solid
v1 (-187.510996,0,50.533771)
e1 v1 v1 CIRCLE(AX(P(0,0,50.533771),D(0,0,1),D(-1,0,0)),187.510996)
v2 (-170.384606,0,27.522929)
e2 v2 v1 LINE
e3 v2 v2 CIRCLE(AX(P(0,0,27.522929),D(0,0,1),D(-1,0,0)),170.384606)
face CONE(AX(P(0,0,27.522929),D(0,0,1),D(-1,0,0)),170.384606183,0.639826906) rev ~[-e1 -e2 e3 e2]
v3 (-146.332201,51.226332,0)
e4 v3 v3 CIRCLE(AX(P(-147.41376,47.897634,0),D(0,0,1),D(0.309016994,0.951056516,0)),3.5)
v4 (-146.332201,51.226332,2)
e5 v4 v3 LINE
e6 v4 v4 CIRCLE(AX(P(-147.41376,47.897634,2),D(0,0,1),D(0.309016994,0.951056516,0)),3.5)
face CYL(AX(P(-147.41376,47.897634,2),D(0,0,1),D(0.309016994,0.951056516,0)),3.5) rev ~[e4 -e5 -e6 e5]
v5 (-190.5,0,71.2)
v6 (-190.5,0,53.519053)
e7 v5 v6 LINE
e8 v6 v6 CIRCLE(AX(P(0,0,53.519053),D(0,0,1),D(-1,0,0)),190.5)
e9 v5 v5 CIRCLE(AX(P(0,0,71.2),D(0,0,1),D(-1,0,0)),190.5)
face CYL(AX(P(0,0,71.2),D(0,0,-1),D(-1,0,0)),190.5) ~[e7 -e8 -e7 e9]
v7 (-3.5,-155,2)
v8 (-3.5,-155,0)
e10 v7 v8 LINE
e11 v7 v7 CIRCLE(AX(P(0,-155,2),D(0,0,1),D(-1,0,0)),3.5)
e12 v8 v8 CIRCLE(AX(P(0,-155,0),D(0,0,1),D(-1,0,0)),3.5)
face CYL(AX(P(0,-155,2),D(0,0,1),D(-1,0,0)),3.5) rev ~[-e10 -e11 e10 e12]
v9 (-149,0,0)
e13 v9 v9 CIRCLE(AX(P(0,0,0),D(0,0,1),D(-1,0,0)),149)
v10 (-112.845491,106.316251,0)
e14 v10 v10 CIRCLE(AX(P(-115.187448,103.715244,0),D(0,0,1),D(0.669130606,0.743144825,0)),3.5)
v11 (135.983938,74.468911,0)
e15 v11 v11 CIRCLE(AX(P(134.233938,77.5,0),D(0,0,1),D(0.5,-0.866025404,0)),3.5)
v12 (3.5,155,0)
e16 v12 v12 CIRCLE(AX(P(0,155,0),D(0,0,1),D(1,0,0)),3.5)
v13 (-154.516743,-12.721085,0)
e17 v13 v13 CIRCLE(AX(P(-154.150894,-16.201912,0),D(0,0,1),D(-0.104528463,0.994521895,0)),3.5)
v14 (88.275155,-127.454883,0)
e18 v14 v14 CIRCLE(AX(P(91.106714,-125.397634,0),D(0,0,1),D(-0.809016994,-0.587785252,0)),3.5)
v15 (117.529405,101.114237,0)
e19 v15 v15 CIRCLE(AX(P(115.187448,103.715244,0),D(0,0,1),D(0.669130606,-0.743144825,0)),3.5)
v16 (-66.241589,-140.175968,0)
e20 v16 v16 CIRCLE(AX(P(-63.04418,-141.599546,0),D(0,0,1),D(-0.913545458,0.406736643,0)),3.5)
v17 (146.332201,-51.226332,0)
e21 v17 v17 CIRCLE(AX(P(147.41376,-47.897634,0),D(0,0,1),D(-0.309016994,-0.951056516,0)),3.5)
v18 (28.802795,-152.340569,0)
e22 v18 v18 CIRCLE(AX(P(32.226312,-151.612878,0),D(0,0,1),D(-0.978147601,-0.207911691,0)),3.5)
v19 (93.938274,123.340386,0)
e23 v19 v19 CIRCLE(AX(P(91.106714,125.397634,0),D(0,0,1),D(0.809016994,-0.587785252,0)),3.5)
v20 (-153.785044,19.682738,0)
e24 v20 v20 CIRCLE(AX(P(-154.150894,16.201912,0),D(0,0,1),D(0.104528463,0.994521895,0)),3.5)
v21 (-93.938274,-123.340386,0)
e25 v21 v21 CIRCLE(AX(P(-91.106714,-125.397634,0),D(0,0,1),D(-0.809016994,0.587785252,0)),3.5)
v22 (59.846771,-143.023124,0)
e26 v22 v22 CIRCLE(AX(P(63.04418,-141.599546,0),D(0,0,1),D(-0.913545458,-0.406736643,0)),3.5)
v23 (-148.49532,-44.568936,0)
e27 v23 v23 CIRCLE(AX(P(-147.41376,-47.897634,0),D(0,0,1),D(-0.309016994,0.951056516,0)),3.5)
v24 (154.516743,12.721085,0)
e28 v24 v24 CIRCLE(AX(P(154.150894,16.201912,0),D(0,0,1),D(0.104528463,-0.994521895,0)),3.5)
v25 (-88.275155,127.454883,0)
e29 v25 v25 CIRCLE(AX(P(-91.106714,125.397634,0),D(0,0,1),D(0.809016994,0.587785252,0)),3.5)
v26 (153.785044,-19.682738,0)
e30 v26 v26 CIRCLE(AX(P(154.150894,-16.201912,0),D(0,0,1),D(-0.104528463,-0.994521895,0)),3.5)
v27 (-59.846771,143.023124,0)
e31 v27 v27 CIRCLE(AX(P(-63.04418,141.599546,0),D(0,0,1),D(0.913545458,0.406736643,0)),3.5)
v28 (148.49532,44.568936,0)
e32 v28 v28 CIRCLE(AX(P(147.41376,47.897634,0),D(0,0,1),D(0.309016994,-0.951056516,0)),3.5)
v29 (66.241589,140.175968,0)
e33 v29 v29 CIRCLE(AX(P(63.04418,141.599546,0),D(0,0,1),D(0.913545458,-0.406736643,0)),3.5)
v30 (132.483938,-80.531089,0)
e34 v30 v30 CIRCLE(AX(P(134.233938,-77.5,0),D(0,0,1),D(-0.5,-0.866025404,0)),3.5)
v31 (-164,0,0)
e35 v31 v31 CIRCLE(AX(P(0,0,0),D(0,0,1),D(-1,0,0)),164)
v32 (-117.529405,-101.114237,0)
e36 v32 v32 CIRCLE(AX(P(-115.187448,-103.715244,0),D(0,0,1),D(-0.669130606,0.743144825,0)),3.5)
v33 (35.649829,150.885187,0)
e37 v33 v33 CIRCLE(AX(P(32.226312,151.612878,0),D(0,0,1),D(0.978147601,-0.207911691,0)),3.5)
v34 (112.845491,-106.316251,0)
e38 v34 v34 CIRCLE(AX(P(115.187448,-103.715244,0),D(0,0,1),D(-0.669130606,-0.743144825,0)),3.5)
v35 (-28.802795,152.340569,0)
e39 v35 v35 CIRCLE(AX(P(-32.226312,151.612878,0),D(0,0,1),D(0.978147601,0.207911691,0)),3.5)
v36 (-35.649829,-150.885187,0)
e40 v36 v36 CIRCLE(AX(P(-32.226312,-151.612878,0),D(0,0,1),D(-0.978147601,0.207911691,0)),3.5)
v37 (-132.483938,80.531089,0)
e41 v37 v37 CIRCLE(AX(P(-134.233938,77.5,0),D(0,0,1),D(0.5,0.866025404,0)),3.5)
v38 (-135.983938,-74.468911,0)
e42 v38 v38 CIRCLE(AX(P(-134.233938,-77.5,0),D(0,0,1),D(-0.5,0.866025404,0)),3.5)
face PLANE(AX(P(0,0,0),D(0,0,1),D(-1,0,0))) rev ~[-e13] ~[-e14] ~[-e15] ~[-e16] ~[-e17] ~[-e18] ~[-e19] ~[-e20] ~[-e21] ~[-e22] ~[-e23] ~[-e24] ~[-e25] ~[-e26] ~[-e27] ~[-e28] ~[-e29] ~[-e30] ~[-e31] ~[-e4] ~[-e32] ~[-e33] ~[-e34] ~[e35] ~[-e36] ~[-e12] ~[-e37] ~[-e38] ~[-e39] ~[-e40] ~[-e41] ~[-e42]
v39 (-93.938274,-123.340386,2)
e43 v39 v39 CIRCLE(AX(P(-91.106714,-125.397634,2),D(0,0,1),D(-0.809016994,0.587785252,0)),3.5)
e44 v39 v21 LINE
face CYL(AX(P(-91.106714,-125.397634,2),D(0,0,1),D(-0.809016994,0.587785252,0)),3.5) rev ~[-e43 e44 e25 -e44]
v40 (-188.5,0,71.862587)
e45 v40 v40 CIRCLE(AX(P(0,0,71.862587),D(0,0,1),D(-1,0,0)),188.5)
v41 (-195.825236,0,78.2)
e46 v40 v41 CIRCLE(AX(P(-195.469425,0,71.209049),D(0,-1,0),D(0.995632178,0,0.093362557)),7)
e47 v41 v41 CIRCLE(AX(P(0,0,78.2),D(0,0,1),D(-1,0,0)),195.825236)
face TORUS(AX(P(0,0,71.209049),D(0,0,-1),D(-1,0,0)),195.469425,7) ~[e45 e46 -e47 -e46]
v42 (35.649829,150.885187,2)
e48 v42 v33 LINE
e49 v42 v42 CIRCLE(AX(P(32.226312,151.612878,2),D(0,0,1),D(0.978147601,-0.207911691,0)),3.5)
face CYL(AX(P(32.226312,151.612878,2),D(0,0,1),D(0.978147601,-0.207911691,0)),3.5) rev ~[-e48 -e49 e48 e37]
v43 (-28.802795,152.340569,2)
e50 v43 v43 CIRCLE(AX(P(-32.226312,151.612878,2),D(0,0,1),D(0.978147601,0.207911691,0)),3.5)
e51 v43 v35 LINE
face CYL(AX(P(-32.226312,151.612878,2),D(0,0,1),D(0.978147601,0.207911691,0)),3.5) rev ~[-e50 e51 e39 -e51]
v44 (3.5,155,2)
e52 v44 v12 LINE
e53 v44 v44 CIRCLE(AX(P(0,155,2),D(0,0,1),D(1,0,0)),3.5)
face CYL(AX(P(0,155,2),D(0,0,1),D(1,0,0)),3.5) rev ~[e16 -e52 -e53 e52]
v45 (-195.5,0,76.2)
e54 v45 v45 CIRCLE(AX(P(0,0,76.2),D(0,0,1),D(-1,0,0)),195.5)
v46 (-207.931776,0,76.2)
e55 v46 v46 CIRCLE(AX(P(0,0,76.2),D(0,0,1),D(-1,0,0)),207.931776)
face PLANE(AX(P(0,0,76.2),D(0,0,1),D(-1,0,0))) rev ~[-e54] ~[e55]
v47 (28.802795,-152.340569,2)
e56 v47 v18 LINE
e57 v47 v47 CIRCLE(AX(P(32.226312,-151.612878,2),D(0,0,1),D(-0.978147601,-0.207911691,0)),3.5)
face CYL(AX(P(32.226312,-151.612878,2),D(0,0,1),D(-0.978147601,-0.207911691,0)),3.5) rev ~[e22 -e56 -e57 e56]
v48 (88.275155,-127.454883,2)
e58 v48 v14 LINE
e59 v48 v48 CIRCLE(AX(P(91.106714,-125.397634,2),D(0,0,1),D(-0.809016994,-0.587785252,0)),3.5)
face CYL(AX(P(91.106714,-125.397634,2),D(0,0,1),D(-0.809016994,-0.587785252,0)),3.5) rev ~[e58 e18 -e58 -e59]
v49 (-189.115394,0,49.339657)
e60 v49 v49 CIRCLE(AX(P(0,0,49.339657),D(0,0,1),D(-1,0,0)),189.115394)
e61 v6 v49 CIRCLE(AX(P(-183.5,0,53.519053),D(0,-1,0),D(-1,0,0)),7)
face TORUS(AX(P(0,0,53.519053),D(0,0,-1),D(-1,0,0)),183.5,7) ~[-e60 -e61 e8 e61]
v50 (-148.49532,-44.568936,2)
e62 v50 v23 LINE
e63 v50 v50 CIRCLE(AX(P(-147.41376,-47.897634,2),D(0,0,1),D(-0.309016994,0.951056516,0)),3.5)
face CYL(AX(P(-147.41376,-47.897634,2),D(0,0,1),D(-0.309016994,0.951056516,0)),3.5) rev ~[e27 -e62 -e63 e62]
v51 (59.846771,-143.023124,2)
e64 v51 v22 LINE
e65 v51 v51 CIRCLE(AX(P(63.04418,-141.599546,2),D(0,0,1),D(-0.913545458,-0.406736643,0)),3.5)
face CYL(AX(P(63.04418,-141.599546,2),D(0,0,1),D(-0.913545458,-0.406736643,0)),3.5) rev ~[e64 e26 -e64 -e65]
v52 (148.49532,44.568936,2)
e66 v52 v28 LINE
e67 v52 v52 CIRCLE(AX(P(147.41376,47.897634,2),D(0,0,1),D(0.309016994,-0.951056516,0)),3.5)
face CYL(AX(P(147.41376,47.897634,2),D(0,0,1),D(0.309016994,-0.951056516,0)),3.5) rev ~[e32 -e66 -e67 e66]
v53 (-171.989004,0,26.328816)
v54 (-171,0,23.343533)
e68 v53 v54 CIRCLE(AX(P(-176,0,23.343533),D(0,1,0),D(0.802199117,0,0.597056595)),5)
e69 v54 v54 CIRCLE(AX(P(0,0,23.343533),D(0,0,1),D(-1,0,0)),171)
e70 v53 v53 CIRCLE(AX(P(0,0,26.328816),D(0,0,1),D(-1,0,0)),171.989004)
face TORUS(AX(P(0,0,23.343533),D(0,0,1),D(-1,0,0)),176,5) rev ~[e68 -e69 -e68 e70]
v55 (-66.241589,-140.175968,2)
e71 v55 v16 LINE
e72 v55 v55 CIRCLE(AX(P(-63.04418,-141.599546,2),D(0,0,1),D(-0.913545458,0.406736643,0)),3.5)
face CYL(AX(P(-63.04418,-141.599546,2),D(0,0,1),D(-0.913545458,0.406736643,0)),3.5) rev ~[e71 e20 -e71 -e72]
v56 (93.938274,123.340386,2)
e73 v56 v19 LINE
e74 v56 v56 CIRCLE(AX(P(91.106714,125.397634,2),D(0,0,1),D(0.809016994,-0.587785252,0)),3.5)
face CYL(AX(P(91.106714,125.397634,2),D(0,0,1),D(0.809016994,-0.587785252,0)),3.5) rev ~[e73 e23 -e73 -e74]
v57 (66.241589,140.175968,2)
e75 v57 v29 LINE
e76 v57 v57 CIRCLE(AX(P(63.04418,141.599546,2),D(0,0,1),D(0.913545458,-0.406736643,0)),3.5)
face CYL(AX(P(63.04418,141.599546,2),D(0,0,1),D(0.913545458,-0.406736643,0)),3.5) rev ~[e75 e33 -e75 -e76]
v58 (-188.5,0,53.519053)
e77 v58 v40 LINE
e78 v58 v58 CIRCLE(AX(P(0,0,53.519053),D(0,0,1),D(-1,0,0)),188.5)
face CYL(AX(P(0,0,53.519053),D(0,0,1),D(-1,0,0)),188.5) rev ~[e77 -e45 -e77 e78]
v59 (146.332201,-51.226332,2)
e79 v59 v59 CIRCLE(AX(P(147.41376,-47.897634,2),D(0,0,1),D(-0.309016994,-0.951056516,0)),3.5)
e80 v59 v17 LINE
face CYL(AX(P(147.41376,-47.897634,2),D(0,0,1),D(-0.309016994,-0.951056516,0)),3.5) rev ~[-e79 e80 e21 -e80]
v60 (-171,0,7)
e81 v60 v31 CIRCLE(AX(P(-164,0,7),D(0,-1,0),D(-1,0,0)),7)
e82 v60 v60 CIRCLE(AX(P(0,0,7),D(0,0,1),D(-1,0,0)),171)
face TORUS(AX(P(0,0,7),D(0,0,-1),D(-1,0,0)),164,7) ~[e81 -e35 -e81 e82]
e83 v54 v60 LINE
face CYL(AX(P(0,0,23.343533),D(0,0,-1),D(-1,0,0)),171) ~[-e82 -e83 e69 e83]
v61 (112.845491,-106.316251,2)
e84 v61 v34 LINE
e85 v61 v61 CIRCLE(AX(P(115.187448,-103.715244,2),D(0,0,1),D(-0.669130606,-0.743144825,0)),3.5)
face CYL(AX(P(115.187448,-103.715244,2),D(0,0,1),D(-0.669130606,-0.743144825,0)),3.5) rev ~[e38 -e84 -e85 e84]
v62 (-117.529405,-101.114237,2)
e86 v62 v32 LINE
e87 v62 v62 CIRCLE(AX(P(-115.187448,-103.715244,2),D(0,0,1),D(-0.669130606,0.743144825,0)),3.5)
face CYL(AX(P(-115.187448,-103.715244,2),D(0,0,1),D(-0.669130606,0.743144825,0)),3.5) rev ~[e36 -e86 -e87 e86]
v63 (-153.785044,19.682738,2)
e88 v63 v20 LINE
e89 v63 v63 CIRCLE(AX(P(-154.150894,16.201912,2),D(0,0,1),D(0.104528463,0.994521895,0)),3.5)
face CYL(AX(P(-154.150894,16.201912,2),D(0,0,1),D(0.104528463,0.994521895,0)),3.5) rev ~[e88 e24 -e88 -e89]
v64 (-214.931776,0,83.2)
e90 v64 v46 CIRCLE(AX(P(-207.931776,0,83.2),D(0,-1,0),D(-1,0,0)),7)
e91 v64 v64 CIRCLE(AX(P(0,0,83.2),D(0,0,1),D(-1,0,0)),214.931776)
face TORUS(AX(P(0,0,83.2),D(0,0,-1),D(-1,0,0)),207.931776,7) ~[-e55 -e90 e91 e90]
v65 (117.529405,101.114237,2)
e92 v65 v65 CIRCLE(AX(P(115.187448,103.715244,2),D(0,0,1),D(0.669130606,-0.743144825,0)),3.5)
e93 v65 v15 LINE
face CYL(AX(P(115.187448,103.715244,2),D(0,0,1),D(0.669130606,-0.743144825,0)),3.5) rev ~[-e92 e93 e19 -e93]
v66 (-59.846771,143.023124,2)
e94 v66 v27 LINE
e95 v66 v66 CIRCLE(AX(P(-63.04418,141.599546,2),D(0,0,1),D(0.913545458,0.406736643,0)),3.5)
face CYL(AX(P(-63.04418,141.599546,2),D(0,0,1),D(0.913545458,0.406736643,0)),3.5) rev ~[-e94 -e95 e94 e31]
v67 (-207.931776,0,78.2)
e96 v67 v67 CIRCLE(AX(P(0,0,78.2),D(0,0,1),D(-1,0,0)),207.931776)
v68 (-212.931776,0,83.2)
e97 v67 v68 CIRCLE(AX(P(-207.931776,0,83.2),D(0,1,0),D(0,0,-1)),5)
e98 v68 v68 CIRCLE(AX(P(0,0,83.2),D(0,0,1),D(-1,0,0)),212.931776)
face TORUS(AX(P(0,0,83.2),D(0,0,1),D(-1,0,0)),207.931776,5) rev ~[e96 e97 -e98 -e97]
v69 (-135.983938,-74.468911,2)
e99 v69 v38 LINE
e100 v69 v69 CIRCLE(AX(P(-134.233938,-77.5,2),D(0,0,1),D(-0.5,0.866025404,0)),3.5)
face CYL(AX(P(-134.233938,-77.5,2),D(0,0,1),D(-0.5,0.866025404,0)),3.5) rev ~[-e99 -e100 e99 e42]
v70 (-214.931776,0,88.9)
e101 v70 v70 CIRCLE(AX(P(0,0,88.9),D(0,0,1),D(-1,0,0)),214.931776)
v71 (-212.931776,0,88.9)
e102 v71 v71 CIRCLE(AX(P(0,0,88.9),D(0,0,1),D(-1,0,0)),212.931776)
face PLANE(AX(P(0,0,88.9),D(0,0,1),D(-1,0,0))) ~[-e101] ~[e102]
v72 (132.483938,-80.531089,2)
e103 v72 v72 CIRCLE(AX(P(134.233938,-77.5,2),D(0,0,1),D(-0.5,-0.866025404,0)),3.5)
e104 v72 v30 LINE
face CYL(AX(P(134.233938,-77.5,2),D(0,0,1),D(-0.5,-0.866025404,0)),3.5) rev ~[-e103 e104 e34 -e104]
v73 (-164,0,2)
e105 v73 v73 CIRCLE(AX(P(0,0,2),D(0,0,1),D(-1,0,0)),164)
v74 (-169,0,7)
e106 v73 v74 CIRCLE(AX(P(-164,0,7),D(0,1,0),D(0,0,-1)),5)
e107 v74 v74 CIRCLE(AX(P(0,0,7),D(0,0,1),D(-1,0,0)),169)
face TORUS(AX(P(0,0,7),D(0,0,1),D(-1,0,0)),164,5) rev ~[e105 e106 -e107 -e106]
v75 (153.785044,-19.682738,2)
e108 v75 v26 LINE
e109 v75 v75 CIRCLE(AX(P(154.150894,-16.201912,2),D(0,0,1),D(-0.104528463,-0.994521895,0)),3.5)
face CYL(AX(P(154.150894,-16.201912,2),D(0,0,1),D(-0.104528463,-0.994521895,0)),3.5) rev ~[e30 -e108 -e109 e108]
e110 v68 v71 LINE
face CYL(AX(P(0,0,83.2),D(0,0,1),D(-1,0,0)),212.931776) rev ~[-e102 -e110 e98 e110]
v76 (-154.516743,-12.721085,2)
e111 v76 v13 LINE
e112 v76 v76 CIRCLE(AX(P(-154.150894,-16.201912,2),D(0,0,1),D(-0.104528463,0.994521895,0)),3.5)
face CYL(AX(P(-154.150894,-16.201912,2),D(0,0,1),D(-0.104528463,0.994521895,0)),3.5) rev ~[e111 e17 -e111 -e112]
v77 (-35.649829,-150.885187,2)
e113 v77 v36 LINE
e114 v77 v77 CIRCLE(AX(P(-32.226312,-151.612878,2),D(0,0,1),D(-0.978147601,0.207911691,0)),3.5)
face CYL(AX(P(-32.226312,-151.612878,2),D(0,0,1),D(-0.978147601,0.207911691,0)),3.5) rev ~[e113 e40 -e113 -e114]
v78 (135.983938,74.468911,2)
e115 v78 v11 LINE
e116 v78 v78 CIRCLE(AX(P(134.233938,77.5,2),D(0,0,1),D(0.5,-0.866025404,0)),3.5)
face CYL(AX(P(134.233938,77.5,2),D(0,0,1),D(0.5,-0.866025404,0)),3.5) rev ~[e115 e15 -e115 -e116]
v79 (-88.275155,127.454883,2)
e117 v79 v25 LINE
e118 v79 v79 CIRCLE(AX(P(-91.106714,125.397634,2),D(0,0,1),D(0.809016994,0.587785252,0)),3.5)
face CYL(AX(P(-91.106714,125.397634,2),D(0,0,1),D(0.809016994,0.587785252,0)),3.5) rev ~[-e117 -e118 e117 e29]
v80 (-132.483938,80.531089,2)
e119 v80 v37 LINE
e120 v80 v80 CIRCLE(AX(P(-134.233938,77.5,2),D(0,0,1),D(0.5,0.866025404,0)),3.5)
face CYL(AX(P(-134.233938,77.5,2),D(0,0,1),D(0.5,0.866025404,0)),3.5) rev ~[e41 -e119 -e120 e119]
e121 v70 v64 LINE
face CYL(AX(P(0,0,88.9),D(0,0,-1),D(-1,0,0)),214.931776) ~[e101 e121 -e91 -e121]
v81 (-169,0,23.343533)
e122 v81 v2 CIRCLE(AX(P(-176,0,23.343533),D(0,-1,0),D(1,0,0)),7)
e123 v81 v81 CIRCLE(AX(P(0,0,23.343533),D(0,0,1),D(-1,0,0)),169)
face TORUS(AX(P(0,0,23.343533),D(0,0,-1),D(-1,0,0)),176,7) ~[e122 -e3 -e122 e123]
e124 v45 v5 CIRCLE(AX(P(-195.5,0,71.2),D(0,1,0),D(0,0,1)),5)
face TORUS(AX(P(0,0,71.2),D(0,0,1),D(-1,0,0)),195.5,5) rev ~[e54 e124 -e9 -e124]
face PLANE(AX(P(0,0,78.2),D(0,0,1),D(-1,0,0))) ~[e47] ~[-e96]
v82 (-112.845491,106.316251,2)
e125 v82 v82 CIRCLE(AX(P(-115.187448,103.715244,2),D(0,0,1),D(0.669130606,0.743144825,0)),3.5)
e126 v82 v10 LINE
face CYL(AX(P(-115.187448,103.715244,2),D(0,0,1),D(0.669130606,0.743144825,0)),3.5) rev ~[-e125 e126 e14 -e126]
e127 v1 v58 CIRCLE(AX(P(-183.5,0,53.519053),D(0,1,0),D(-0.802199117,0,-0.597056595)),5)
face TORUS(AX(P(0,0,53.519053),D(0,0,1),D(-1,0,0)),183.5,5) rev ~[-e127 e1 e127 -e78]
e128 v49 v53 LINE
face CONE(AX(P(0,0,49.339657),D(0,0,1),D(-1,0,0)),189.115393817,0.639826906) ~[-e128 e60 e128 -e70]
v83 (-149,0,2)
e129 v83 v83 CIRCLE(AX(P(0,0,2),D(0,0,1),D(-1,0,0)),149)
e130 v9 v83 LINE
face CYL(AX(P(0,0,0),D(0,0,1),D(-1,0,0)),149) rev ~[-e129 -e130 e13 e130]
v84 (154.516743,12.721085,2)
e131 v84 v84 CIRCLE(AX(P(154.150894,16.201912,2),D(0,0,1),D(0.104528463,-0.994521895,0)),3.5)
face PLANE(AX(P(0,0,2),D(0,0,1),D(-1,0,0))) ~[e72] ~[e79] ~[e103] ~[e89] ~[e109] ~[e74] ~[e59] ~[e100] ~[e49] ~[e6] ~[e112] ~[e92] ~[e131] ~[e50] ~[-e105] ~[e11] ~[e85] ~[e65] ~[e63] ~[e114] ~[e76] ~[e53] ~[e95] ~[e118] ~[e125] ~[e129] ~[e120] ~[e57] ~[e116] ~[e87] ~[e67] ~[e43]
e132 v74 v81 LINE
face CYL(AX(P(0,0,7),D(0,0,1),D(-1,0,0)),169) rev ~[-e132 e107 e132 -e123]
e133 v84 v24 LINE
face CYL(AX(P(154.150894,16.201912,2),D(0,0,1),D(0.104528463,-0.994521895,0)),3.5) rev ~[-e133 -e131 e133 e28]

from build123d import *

# Parameters (mm, degrees)
F2_R            = 3.5
F3_DEPTH        = 2.001
F3_COPIES_COUNT = 30


# Not quite as in the source:
# - a pattern or mirror of a feature is missing from the dataset's text; its kind, count and spacing are read off the source's solid


with BuildPart() as f1:
    # F0 (on Front) → F1 (revolve)
    with BuildSketch(Plane.XZ):
        with BuildLine():
            Line((-164, 0), (-149, 0))
            Line((-149, 0), (-149, 2))
            Line((-149, 2), (-164, 2))
            ThreePointArc((-164, 2), (-167.5355339059, 3.4644660941), (-169, 7))
            Line((-169, 7), (-169, 23.3435332173))
            ThreePointArc((-169, 23.3435332173), (-169.3551615249, 25.5449240594), (-170.3846061827, 27.5229293791))
            Line((-170.3846061827, 27.5229293791), (-187.5109955838, 50.5337705231))
            ThreePointArc((-187.5109955838, 50.5337705231), (-188.2463131965, 51.9466314657), (-188.5, 53.5190534957))
            Line((-188.5, 53.5190534957), (-188.5, 71.8625867131))
            ThreePointArc((-188.5, 71.8625867131), (-190.8895043975, 76.5028494379), (-195.8252362977, 78.2))
            Line((-195.8252362977, 78.2), (-207.9317760463, 78.2))
            ThreePointArc((-207.9317760463, 78.2), (-211.4673099522, 79.6644660941), (-212.9317760463, 83.2))
            Line((-212.9317760463, 83.2), (-212.9317760463, 88.9))
            Line((-212.9317760463, 88.9), (-214.9317760463, 88.9))
            Line((-214.9317760463, 88.9), (-214.9317760463, 83.2))
            ThreePointArc((-214.9317760463, 83.2), (-212.8815235146, 78.2502525317), (-207.9317760463, 76.2))
            Line((-207.9317760463, 76.2), (-195.5, 76.2))
            ThreePointArc((-195.5, 76.2), (-191.9644660941, 74.7355339059), (-190.5, 71.2))
            Line((-190.5, 71.2), (-190.5, 53.5190534957))
            ThreePointArc((-190.5, 53.5190534957), (-190.1448384751, 51.3176626537), (-189.1153938173, 49.339657334))
            Line((-189.1153938173, 49.339657334), (-171.9890044162, 26.32881619))
            ThreePointArc((-171.9890044162, 26.32881619), (-171.2536868035, 24.9159552474), (-171, 23.3435332173))
            Line((-171, 23.3435332173), (-171, 7))
            ThreePointArc((-171, 7), (-168.9497474683, 2.0502525317), (-164, 0))
        make_face()
    revolve(axis=Axis((0, 0, 22.5889328867), (0, 0, 1)))

    # F2 (on face) → F3 (cut, through all)
    with BuildSketch(Plane.XY.offset(2)):
        with Locations((0, 155)):
            Circle(F2_R)
    f3 = extrude(amount=-F3_DEPTH, mode=Mode.SUBTRACT)

    # F3_copies: F3 ×30 about axis
    f3_copies_axis = Axis((0, 0, 0), (0, 0, 1))
    for i in range(1, F3_COPIES_COUNT):
        add(f3.rotate(f3_copies_axis, i * 360 / F3_COPIES_COUNT), mode=Mode.SUBTRACT)


solid = f1.part
